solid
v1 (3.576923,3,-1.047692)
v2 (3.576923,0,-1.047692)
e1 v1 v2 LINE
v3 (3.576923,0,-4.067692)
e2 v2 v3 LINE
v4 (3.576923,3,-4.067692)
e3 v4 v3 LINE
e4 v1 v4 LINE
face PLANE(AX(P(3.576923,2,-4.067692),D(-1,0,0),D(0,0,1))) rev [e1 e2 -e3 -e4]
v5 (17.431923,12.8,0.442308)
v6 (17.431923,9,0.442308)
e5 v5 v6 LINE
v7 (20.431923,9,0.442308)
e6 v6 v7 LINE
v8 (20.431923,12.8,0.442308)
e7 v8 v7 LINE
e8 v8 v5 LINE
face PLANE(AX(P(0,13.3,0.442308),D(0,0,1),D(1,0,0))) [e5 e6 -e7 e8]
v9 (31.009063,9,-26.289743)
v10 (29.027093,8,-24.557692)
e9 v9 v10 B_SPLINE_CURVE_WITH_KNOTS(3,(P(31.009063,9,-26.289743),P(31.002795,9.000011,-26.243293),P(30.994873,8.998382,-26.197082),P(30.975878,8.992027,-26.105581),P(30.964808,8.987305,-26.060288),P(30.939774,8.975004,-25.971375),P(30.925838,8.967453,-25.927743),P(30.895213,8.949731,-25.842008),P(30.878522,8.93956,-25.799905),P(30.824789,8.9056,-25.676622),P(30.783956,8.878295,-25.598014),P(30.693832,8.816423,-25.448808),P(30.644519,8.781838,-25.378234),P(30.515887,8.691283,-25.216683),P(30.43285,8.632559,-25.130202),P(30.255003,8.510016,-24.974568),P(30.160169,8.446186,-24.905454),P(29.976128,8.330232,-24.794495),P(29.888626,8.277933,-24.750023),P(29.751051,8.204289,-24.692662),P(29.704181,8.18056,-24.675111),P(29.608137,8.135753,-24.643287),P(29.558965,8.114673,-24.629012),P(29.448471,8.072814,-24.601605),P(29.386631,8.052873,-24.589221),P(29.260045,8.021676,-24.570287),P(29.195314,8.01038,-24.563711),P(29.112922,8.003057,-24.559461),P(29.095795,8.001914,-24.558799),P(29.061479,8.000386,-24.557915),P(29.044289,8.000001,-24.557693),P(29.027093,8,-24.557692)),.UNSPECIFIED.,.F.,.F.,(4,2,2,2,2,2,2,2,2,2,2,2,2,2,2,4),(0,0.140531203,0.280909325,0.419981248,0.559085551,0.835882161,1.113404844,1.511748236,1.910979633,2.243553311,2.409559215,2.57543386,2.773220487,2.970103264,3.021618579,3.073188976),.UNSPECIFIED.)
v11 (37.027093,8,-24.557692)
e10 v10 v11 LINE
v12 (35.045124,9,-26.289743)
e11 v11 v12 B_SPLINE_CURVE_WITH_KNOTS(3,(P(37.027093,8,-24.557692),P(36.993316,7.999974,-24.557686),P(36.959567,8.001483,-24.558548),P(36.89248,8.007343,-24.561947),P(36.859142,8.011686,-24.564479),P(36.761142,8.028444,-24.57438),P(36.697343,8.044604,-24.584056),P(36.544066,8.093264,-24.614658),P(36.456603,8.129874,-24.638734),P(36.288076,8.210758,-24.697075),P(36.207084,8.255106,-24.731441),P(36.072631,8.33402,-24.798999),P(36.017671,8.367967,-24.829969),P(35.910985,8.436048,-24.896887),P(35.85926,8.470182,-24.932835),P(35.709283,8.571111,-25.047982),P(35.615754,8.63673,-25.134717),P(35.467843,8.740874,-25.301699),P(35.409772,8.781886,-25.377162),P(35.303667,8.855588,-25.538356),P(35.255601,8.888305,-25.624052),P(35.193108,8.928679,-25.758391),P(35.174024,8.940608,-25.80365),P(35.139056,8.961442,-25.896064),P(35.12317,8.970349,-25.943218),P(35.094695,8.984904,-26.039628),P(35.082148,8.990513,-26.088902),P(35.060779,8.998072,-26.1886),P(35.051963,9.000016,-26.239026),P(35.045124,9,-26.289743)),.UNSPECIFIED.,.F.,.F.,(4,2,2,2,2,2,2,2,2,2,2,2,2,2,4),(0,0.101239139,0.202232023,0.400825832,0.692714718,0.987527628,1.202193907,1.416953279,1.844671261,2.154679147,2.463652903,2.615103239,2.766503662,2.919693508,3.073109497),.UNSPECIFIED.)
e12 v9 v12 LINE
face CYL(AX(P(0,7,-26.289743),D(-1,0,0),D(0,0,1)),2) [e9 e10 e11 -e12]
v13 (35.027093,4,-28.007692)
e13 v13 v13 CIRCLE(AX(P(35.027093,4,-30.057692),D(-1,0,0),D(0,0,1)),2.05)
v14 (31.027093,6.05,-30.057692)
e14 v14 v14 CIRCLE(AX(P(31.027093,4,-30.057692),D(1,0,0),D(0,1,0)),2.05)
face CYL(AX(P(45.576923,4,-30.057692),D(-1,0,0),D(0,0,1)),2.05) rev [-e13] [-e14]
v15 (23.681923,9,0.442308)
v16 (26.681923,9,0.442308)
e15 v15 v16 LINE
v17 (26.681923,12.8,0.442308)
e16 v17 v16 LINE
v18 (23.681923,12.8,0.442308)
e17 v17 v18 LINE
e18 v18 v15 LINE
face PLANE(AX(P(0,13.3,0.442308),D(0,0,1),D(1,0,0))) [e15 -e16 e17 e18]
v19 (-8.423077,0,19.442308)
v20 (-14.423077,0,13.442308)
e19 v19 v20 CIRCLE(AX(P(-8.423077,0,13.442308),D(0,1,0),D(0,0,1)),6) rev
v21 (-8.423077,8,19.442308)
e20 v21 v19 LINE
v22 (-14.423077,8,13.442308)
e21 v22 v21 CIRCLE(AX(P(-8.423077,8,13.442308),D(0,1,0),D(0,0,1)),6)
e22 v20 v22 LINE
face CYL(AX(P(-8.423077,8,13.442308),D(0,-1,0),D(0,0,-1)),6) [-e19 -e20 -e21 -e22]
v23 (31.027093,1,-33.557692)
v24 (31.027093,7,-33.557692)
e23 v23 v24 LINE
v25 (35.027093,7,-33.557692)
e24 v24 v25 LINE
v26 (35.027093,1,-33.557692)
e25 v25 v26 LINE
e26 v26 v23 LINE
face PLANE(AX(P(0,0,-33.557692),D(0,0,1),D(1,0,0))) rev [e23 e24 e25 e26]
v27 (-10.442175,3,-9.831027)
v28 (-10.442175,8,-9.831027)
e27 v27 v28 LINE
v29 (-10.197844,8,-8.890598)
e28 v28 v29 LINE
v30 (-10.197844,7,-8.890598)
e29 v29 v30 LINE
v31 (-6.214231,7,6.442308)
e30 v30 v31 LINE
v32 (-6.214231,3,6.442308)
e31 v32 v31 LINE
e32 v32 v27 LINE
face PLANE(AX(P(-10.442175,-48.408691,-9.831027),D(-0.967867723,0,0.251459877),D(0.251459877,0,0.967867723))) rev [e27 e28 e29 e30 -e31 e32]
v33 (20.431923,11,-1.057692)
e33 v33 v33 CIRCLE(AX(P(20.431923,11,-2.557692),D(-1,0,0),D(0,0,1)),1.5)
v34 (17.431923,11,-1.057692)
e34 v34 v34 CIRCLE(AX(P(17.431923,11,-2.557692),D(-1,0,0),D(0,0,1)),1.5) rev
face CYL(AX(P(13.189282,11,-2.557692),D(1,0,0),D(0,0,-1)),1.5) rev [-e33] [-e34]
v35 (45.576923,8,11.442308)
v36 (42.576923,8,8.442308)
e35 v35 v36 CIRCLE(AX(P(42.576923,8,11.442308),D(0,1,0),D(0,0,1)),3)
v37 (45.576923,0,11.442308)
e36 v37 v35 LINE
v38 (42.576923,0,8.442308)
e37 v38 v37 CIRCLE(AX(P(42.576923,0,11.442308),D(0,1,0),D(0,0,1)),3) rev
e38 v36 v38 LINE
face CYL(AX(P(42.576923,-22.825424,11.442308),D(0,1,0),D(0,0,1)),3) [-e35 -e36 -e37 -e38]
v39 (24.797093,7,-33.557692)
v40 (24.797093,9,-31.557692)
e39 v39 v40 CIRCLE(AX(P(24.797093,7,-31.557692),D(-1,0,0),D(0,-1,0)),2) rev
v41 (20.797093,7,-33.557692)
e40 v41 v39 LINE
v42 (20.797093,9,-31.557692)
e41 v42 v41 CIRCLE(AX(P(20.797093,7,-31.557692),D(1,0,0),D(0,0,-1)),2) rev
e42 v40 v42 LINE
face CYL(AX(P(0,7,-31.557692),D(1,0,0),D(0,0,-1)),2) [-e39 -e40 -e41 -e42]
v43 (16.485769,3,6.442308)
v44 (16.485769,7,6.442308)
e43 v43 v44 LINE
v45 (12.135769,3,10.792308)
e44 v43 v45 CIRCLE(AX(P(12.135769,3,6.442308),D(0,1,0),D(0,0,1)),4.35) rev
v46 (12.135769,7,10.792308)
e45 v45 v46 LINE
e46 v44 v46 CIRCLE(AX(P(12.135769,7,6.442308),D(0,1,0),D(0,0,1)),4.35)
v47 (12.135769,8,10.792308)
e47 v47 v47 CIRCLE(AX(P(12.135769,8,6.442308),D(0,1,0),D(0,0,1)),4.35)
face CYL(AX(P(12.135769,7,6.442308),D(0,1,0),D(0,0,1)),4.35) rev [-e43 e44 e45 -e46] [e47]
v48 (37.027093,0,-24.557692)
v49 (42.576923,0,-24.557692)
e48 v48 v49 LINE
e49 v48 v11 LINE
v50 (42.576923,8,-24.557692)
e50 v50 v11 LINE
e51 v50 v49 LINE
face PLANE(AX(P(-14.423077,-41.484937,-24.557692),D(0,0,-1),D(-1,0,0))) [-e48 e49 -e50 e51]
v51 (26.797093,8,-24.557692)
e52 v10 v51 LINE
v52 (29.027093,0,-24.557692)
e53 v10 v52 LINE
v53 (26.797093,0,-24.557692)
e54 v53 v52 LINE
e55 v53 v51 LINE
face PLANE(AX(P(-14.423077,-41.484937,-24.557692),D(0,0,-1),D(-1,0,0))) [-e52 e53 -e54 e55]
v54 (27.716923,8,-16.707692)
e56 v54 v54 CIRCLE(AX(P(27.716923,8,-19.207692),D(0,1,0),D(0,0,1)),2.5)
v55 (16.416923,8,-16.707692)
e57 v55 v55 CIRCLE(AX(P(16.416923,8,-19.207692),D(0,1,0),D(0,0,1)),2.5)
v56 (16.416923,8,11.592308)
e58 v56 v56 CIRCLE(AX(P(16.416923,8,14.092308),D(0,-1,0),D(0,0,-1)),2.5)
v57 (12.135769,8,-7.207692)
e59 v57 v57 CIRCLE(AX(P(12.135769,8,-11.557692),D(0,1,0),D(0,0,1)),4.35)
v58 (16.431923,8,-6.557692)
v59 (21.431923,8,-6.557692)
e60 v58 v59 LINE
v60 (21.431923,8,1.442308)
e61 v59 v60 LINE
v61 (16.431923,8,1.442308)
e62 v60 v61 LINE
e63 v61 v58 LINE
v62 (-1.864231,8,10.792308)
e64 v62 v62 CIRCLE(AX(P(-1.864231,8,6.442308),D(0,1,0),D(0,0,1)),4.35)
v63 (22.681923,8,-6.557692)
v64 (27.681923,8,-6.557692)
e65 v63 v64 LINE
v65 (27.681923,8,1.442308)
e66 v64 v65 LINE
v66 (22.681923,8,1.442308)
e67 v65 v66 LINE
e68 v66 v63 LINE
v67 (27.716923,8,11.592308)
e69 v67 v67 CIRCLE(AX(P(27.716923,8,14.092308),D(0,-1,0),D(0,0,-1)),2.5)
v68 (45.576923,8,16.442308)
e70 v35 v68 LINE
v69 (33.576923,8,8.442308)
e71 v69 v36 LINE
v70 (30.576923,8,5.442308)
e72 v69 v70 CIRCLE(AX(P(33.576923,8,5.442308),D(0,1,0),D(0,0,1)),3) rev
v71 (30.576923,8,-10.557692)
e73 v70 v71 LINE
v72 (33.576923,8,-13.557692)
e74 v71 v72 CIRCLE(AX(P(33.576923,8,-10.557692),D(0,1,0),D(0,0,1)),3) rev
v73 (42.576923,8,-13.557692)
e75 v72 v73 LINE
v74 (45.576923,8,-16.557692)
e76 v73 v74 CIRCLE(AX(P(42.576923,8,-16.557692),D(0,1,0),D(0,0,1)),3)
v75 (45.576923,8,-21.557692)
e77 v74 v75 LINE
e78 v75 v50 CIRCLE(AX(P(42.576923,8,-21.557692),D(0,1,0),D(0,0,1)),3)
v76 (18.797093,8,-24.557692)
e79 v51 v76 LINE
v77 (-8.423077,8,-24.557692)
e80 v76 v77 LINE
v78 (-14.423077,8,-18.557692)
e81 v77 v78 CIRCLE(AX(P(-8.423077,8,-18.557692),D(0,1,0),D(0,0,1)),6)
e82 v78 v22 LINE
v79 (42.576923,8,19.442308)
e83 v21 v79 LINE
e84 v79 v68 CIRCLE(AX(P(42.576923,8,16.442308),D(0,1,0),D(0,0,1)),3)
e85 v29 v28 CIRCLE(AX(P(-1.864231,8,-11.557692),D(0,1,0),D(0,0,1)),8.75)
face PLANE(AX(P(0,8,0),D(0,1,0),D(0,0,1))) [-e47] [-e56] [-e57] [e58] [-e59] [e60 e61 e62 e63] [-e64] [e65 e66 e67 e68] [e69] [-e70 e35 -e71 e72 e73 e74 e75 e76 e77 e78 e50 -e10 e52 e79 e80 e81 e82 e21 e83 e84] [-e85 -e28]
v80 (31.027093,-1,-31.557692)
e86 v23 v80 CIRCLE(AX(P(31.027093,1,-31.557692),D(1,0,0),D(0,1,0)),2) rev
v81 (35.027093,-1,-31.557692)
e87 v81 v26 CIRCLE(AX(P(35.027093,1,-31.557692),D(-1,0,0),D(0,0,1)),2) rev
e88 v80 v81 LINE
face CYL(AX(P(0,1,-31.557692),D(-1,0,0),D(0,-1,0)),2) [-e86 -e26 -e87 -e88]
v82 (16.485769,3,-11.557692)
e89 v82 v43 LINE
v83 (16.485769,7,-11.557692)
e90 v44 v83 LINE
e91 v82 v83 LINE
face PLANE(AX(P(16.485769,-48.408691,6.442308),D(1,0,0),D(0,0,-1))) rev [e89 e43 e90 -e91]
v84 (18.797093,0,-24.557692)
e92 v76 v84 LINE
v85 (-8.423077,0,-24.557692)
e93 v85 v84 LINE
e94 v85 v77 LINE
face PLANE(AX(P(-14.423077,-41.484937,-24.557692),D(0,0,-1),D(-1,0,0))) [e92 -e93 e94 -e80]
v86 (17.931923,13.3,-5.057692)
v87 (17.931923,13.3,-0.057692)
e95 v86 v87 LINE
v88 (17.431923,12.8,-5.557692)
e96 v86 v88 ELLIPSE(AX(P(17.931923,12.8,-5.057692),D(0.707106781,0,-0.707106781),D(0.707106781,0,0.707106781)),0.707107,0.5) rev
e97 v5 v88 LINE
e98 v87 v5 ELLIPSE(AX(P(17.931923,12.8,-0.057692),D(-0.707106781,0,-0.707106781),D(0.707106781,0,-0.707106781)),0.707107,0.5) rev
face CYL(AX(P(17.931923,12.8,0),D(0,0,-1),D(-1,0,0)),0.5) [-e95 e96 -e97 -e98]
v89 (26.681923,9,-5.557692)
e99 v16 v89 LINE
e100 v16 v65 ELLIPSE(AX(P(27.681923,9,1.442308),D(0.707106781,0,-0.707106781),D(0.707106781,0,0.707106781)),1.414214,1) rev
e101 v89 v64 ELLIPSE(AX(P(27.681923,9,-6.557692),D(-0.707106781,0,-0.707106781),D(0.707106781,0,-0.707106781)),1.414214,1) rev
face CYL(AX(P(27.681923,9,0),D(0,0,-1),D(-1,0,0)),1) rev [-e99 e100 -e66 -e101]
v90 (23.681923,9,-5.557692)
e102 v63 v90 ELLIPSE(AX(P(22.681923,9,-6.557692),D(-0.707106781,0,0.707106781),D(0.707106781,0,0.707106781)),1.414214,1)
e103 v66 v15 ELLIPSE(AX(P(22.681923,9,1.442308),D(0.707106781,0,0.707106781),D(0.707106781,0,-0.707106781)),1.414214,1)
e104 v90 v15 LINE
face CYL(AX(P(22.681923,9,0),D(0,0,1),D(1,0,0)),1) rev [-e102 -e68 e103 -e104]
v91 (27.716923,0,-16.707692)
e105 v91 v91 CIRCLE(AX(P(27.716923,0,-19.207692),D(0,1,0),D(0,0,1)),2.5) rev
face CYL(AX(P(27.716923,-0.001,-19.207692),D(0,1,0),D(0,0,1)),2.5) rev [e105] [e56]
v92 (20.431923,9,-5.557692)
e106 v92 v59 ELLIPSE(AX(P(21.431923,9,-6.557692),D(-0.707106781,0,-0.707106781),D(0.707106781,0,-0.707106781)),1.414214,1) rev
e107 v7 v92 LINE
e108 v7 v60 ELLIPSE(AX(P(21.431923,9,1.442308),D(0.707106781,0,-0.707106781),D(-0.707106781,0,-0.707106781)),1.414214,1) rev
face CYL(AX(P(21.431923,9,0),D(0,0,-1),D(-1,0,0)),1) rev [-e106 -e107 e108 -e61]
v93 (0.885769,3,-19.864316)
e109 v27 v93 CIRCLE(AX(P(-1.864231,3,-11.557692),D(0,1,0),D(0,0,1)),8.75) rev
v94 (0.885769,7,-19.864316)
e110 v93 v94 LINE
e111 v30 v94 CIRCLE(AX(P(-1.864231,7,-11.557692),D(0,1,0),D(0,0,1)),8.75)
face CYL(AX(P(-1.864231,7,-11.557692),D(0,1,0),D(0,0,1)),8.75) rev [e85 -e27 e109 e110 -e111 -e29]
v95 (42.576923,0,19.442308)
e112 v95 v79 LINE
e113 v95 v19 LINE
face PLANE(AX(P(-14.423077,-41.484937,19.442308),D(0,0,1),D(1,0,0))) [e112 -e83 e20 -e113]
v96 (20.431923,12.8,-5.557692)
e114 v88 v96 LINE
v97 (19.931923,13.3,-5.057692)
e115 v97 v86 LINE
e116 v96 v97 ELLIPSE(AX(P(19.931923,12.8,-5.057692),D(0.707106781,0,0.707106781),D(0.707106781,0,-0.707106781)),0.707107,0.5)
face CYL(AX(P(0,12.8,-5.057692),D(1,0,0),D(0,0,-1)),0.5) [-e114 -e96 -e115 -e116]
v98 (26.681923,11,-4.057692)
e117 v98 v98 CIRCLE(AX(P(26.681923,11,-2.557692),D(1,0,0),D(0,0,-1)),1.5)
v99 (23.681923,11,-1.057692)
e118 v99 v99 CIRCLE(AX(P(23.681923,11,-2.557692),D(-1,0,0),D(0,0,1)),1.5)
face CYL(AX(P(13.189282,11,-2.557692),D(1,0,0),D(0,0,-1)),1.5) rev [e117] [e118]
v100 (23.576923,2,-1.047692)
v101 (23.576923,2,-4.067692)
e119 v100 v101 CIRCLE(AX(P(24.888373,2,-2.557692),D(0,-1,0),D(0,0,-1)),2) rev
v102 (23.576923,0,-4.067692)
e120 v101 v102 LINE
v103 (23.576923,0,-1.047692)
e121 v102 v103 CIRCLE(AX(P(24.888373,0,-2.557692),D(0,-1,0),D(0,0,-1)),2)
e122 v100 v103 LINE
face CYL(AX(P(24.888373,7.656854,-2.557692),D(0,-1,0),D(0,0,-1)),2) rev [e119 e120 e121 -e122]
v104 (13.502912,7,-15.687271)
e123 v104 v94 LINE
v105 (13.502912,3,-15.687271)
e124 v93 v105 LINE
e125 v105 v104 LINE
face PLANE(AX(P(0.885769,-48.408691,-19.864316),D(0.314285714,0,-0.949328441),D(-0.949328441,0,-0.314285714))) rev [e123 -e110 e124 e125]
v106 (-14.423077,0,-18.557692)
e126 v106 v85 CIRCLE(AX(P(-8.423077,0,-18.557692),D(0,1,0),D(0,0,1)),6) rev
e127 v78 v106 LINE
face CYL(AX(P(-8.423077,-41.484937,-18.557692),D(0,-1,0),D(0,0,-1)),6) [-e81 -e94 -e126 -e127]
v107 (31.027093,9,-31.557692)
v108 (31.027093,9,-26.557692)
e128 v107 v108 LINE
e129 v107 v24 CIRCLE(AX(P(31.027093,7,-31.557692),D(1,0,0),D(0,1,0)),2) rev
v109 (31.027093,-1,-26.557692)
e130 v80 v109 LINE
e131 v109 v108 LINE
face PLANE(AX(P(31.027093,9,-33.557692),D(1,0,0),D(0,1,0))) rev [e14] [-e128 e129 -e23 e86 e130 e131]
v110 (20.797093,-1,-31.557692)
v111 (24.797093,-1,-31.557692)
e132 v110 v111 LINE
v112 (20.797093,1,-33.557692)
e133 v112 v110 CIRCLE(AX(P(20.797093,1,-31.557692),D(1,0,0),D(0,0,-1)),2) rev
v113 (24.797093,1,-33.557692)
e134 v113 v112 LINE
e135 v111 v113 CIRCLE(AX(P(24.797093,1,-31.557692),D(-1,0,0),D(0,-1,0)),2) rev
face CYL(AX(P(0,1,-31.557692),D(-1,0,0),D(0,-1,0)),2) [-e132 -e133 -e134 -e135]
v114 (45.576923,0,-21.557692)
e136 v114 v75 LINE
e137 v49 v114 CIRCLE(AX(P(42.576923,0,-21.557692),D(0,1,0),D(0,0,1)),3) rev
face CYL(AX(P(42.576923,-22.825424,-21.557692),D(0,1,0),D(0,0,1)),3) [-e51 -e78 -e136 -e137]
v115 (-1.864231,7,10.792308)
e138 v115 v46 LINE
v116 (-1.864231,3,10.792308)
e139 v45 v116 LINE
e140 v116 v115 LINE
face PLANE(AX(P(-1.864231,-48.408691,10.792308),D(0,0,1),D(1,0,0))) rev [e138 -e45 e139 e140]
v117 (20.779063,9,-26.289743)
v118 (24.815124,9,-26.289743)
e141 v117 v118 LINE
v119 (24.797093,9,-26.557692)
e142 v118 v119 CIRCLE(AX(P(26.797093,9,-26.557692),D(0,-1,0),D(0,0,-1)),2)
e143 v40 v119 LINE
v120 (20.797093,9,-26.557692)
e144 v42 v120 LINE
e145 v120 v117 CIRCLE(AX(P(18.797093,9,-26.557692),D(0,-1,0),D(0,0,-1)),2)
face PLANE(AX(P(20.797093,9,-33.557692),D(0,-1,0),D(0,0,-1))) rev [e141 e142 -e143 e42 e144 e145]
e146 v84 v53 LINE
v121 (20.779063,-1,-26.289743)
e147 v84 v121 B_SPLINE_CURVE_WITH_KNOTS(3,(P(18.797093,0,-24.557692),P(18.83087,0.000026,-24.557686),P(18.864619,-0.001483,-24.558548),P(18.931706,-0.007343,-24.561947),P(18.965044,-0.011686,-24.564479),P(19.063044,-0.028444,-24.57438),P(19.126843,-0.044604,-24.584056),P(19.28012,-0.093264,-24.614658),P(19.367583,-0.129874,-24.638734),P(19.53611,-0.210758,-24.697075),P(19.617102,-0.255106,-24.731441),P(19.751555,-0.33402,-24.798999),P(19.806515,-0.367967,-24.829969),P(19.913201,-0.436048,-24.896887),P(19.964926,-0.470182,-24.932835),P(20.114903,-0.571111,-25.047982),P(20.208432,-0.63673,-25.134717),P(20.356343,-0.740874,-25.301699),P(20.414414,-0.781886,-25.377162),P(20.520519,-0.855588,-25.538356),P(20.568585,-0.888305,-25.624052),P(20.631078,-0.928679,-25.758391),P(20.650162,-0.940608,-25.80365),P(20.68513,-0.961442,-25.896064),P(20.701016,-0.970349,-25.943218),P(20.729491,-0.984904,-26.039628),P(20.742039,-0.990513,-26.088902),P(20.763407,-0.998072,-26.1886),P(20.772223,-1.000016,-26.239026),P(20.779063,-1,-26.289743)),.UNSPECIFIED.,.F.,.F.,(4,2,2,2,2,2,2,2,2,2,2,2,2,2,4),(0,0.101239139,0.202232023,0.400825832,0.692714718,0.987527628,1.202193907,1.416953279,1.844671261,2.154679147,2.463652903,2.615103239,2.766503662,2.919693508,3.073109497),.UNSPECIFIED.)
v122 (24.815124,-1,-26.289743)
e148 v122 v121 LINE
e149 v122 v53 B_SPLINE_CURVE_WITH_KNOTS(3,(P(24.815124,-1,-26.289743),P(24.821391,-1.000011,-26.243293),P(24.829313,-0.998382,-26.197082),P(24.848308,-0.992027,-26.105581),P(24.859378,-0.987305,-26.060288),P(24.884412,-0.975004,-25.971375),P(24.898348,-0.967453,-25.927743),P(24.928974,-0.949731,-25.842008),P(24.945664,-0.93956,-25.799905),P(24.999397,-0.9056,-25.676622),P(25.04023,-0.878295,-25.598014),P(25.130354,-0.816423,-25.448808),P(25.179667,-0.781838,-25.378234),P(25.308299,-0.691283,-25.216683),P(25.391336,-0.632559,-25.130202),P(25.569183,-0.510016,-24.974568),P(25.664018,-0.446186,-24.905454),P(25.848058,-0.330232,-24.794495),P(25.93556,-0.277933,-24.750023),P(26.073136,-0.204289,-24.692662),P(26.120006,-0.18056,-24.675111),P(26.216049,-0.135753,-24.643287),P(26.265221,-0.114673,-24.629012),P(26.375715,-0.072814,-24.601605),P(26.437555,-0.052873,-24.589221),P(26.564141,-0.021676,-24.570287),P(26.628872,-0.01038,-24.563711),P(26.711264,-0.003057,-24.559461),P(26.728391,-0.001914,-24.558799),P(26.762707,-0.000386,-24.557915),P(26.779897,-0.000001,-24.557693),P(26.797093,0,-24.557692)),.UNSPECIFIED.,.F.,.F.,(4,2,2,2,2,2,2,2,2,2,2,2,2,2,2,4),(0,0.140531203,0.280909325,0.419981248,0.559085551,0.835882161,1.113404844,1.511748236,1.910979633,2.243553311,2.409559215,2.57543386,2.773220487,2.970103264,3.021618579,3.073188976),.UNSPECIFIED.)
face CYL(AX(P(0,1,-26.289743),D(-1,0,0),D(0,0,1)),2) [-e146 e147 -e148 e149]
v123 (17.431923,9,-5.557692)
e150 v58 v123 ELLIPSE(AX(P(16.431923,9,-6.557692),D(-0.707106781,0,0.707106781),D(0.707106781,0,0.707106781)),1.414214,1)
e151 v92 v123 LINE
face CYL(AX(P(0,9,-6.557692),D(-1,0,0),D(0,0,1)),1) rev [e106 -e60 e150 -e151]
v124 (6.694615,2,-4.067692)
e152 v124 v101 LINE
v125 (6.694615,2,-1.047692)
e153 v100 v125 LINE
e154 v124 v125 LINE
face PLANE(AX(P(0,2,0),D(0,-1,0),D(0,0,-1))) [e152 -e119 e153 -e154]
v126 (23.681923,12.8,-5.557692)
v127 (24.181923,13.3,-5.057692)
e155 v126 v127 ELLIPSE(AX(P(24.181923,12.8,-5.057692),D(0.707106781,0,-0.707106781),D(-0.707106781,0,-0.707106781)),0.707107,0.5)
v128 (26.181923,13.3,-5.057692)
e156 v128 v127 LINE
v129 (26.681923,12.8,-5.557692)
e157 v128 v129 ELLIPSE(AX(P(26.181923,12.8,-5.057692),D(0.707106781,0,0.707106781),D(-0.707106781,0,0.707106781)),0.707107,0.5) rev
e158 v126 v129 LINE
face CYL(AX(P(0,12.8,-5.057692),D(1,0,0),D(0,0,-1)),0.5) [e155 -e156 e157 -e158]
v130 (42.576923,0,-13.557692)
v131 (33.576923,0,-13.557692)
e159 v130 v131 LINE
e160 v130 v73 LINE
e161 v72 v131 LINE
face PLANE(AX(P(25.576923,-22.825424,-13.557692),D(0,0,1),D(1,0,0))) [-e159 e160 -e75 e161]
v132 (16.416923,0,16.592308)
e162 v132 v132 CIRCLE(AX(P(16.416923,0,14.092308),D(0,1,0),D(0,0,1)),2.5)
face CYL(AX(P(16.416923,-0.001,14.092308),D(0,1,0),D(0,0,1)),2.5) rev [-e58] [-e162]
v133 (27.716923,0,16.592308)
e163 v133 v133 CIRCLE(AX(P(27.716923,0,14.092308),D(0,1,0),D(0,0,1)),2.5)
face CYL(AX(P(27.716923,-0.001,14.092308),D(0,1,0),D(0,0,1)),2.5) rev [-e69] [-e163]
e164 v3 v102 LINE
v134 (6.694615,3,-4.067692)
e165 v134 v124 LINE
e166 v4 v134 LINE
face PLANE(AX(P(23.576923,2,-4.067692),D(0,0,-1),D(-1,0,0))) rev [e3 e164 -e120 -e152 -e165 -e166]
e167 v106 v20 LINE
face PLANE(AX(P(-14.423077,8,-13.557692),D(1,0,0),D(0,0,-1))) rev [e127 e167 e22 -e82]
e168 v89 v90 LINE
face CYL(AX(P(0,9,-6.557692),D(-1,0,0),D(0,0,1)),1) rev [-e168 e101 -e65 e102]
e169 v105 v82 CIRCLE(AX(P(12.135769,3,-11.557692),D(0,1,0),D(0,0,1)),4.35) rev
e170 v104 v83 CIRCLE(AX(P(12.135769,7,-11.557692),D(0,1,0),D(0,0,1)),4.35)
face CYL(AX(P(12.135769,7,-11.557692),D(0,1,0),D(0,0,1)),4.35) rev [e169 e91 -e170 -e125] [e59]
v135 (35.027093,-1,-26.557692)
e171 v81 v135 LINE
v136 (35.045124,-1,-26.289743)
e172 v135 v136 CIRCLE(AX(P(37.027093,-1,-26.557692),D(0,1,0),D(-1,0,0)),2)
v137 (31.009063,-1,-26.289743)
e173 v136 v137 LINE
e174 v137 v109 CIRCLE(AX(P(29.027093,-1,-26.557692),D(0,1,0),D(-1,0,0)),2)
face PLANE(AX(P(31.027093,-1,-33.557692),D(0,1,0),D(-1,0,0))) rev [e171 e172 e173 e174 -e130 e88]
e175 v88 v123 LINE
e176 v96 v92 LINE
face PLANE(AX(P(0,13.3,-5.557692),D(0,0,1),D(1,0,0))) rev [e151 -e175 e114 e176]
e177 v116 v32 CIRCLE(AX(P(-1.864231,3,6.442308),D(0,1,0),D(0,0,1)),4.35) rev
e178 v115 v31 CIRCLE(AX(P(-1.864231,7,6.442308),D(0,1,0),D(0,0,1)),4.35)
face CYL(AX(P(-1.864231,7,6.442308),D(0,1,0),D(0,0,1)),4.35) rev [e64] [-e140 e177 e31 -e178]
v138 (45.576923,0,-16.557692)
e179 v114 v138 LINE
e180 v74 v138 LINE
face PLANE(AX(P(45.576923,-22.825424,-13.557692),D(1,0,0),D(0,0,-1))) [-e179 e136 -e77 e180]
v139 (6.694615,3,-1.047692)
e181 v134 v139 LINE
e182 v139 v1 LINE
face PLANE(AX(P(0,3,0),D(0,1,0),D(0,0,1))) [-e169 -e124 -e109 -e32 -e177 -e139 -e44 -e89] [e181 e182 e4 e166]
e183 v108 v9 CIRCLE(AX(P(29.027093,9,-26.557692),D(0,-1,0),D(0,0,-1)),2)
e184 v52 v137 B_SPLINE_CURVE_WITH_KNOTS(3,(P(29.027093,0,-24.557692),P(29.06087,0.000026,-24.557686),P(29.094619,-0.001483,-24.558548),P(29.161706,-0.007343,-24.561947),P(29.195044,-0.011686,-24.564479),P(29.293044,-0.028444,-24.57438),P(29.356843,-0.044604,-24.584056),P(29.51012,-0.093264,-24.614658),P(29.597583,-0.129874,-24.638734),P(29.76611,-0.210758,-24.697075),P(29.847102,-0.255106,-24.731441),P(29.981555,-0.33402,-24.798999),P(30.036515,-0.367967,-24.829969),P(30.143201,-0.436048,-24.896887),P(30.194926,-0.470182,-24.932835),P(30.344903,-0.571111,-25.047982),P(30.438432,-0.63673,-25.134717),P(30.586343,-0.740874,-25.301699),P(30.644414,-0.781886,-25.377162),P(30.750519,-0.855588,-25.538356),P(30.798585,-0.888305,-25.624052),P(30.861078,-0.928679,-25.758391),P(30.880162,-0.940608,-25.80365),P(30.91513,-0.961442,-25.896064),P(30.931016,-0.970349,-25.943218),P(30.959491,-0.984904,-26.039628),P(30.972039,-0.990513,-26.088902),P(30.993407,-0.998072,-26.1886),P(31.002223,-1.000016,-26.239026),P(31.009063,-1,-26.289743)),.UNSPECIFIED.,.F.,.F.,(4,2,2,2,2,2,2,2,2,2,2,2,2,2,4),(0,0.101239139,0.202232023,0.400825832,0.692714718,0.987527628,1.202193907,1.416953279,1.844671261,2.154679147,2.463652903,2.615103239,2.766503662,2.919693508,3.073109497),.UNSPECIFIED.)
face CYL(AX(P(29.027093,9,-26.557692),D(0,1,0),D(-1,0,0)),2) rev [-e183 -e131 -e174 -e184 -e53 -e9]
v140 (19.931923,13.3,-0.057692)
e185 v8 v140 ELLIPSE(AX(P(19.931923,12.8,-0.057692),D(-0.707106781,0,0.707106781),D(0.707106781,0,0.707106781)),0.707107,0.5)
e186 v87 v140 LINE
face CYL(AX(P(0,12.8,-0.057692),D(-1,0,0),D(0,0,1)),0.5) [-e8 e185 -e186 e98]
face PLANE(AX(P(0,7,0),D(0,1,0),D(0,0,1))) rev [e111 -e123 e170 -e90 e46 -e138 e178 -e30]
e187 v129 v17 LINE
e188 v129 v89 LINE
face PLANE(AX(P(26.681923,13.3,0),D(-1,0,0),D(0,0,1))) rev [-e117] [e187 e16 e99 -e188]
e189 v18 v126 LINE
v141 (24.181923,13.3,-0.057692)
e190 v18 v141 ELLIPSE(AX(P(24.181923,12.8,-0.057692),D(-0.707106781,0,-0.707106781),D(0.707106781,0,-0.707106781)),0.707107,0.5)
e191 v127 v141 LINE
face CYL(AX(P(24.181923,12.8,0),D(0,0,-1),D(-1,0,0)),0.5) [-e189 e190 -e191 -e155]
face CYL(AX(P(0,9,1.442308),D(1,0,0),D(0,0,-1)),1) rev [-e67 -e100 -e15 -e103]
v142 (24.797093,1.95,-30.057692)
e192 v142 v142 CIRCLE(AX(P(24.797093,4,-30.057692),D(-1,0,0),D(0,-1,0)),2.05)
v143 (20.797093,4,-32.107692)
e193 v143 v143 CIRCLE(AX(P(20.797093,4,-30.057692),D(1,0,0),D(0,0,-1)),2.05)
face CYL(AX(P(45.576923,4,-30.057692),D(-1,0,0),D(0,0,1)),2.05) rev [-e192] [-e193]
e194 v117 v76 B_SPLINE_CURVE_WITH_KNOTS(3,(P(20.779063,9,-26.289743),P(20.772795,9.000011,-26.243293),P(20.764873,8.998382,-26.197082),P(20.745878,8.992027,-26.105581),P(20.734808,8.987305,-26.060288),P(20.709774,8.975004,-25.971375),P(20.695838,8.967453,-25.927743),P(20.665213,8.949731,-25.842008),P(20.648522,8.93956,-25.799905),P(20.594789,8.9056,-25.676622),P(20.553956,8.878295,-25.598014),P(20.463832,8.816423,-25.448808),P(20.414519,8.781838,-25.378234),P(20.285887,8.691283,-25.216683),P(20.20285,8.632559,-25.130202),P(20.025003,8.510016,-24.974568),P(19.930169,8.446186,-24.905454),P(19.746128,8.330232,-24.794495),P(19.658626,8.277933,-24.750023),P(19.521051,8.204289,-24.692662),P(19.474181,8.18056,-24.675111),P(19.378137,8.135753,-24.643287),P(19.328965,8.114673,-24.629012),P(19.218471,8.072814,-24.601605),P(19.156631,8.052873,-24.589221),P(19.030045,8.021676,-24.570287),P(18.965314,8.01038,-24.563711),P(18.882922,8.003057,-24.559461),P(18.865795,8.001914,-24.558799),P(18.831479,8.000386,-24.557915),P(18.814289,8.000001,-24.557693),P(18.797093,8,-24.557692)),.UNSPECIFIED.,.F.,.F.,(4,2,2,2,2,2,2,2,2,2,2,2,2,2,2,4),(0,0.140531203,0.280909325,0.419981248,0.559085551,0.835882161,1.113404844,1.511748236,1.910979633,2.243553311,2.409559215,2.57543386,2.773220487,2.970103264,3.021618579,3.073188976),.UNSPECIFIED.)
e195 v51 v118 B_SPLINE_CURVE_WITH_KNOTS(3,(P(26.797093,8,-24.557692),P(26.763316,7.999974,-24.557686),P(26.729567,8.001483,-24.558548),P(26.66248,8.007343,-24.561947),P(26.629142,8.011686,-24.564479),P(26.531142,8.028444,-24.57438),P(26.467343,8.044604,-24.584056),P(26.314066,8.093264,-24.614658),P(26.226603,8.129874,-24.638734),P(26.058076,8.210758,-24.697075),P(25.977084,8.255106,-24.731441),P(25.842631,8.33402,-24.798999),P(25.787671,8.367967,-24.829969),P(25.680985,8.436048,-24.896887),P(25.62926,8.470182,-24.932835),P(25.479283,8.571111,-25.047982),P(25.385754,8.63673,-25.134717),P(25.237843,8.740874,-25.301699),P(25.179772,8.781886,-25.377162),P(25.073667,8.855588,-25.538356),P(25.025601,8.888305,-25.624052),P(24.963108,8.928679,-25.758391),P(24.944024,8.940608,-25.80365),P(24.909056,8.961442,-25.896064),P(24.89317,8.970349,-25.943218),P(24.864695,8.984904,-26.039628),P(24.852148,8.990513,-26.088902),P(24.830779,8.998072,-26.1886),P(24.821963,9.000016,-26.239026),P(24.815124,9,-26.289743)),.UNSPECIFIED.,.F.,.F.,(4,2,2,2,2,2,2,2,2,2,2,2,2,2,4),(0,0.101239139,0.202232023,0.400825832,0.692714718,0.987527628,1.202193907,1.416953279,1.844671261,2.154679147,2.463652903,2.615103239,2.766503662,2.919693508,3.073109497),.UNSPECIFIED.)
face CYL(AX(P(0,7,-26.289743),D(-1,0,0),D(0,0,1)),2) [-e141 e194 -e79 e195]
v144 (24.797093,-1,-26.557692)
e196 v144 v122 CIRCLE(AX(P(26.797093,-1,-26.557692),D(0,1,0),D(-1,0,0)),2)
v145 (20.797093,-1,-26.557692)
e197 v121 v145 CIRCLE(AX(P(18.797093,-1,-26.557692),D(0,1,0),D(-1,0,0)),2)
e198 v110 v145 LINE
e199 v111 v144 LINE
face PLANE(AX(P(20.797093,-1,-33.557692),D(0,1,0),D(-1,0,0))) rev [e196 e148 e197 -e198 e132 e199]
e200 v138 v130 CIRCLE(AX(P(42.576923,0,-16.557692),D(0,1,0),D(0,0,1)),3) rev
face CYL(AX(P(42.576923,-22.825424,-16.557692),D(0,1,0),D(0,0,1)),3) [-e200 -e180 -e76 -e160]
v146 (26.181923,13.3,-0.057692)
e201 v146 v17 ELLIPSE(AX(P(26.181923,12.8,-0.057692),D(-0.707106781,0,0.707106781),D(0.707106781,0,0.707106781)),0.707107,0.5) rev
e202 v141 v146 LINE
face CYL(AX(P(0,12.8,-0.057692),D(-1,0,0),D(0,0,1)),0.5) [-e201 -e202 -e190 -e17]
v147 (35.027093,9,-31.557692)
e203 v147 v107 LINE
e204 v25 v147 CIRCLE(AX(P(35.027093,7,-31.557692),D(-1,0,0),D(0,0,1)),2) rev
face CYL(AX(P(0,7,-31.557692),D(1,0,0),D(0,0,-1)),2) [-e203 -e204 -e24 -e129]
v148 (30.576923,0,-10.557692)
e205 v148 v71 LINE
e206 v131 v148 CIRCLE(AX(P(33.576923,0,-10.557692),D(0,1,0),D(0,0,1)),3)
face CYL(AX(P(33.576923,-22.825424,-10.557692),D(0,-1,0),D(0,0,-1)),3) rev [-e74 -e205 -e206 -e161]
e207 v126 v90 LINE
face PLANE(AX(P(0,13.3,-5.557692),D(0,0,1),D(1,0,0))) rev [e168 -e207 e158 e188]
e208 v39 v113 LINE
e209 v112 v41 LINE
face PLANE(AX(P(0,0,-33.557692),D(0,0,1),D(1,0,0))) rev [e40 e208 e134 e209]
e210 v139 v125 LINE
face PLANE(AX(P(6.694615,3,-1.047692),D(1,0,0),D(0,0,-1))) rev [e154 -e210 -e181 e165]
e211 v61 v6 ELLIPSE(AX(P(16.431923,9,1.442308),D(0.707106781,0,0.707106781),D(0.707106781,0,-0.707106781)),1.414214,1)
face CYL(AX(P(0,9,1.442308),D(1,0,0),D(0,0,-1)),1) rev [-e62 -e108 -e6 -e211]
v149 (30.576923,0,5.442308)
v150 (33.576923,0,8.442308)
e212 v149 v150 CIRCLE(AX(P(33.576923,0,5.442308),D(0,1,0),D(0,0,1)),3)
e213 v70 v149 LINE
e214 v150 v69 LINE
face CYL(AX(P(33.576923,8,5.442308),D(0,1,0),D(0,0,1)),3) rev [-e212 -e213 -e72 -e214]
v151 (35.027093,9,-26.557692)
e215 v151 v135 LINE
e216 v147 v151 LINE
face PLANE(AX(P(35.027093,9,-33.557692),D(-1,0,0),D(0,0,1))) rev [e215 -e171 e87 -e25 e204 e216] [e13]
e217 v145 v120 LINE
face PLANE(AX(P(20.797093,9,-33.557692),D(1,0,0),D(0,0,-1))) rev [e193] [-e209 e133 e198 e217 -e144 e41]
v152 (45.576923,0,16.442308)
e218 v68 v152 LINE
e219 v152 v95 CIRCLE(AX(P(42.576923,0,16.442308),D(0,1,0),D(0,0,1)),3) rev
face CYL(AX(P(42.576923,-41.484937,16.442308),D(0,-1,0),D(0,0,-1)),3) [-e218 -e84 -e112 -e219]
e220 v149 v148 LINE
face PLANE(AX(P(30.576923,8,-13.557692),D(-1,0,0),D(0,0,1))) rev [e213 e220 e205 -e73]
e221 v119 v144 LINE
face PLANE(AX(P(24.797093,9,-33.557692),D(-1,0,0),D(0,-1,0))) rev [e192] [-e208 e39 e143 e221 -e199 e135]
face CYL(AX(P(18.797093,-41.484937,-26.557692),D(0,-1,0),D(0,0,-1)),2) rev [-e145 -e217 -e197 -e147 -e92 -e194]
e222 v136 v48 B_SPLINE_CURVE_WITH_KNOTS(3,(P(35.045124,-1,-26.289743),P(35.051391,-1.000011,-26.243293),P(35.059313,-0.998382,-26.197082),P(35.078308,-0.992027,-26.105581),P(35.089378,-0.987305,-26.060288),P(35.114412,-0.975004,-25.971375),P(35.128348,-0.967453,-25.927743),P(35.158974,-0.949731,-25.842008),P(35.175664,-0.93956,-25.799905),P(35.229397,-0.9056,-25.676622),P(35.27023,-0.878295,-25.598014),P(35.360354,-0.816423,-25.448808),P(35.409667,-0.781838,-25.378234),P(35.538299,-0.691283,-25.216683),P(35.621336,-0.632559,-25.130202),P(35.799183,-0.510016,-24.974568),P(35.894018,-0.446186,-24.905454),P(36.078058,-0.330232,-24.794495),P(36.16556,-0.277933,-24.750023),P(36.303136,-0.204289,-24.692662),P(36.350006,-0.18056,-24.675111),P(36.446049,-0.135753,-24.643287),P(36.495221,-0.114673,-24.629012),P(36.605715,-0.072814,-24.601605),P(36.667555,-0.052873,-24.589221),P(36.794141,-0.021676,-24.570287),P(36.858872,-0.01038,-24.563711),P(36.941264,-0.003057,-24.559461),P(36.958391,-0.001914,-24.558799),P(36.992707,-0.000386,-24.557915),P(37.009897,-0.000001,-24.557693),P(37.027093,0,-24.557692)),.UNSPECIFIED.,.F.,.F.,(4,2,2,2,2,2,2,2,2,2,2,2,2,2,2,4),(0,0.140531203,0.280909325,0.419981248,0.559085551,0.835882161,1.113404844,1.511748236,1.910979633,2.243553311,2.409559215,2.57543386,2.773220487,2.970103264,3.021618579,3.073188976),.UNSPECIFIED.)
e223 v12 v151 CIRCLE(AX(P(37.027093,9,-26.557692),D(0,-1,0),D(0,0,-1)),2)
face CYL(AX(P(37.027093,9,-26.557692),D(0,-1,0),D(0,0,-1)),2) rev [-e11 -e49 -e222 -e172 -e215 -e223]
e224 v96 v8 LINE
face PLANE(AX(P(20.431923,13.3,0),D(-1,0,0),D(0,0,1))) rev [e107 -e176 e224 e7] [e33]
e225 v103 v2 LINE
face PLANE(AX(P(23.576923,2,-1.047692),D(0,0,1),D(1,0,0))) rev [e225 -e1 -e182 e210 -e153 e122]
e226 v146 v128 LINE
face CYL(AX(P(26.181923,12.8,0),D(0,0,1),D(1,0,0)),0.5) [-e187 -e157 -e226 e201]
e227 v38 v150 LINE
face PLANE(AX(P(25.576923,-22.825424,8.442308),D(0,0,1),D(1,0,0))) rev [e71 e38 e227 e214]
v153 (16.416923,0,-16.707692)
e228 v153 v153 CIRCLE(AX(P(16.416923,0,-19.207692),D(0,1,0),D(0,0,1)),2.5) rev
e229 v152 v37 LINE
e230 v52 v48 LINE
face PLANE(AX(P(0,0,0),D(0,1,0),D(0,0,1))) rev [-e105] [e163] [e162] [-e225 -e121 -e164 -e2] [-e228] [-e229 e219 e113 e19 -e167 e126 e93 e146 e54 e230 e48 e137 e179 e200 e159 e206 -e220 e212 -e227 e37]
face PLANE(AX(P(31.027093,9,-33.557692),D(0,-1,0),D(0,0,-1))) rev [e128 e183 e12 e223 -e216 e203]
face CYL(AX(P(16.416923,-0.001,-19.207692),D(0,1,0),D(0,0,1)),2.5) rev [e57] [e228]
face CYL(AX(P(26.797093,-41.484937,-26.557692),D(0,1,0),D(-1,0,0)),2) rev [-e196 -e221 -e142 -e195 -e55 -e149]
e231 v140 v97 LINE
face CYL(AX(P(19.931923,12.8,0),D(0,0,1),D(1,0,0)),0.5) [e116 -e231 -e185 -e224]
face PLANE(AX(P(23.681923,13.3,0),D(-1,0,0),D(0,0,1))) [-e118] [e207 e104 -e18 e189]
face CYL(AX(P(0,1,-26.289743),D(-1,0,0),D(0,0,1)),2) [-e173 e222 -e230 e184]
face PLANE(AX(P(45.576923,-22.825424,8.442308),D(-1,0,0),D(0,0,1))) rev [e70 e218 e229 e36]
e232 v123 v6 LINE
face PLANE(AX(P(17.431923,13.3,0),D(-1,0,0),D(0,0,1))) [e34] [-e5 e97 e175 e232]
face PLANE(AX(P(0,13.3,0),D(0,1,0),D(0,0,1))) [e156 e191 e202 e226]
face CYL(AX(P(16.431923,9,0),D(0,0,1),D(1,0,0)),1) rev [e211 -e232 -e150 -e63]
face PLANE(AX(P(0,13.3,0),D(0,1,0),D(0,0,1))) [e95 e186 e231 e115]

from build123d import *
from build123d.topology import SkipClean

# Parameters (mm, degrees)
SKETCH2_W                = 45
SKETCH2_H                = 22
BOSS_EXTRUDE1_DEPTH      = 8
SKETCH3_W                = 20
SKETCH3_H                = 3.02
CUT_EXTRUDE1_DEPTH       = 2
SKETCH11_R               = 2
CUT_EXTRUDE4_DEPTH       = 2
SKETCH19_W               = 3.117691909
SKETCH19_H               = 3.02
CUT_EXTRUDE5_DEPTH       = 3
SKETCH29_W               = 40
SKETCH29_H               = 11
BOSS_EXTRUDE6_DEPTH      = 8
SKETCH21_W               = 30
SKETCH21_H               = 36
CUT_EXTRUDE8_DEPTH       = 5
SKETCH24_W               = 30
SKETCH24_H               = 36
SKETCH24_R               = 4.35
SKETCH24_R_2             = 8.75
BOSS_EXTRUDE3_DEPTH      = 1
SKETCH25_W               = 3
SKETCH25_H               = 6
BOSS_EXTRUDE4_DEPTH      = 5.3
CUT_EXTRUDE9_REACH       = 51.695
SKETCH26_R               = 1.5
FILLET2_R                = 1
FILLET3_R                = 0.5
SKETCH27_W               = 20
SKETCH27_H               = 11
BOSS_EXTRUDE5_DEPTH      = 8
CUT_EXTRUDE10_REACH      = 54.386
SKETCH28_R               = 2.5
FILLET5_R                = 6
FILLET6_R                = 3
BOSS_EXTRUDE7_START      = -5
SKETCH30_W               = 30.600469098
SKETCH30_H               = 41.30937857
SKETCH30_R               = 2.5
BOSS_EXTRUDE7_DEPTH      = 5
SKETCH32_W               = 4
SKETCH32_H               = 10
BOSS_EXTRUDE8_DEPTH      = 9
CUT_EXTRUDE11_DEPTH      = 51.432817558
CUT_EXTRUDE11_DEPTH_BACK = 51.432817558
SKETCH34_R               = 2.05
FILLET7_R                = 2
FILLET8_DEPTH            = 7.999999573
FILLET8_START            = -1
FILLET8_2_DEPTH          = 10
FILLET8_START_2          = 18
FILLET8_3_DEPTH          = 20


with BuildPart() as part:
    # Sketch2 → Boss-Extrude1 (new body)
    with BuildSketch(Plane(origin=(0, 0, 0), x_dir=(1, 0, 0), z_dir=(0, 1, 0))):
        with Locations((8.076923077, 2.557692308)):
            Rectangle(SKETCH2_W, SKETCH2_H)
    extrude(amount=BOSS_EXTRUDE1_DEPTH)

    # Sketch3 → Cut-Extrude1 (cut)
    with BuildSketch(Plane.XZ):
        with Locations((13.576923077, -2.557692308)):
            Rectangle(SKETCH3_W, SKETCH3_H)
    extrude(amount=-CUT_EXTRUDE1_DEPTH, mode=Mode.SUBTRACT)

    # Sketch11 → Cut-Extrude4 (cut)
    with BuildSketch(Plane.XZ):
        with Locations((24.888372657, -2.557692308)):
            Circle(SKETCH11_R)
    extrude(amount=-CUT_EXTRUDE4_DEPTH, mode=Mode.SUBTRACT)

    # Sketch19 → Cut-Extrude5 (cut)
    with BuildSketch(Plane.XZ):
        with Locations((5.135769032, -2.557692308)):
            Rectangle(SKETCH19_W, SKETCH19_H)
    extrude(amount=-CUT_EXTRUDE5_DEPTH, mode=Mode.SUBTRACT)

    # Sketch29 → Boss-Extrude6 (add)
    with BuildSketch(Plane(origin=(0, 8, 0), x_dir=(1, 0, 0), z_dir=(0, 1, 0))):
        with Locations((5.576923077, 19.057692308)):
            Rectangle(SKETCH29_W, SKETCH29_H)
        with Locations((5.576923077, -13.942307692)):
            Rectangle(SKETCH29_W, SKETCH29_H)
    extrude(amount=-BOSS_EXTRUDE6_DEPTH)

    # Sketch21 → Cut-Extrude8 (cut)
    with BuildSketch(Plane.XZ.offset(-3)):
        with Locations((4.135769031, -2.557692308)):
            Rectangle(SKETCH21_W, SKETCH21_H)
    extrude(amount=-CUT_EXTRUDE8_DEPTH, mode=Mode.SUBTRACT)

    # Sketch24 → Boss-Extrude3 (add)
    with BuildSketch(Plane(origin=(0, 8, 0), x_dir=(1, 0, 0), z_dir=(0, 1, 0))):
        with Locations((4.135769031, 2.557692308)):
            Rectangle(SKETCH24_W, SKETCH24_H)
        with Locations(Location((12.135769031, 11.557692308, 0), (0, 0, 270))):
            Circle(SKETCH24_R, mode=Mode.SUBTRACT)
        with Locations(Location((-1.864230969, 11.557692308, 0), (0, 0, 270))):
            Circle(SKETCH24_R_2, mode=Mode.SUBTRACT)
        with Locations(Location((12.135769031, -6.442307692, 0), (0, 0, 270))):
            Circle(SKETCH24_R, mode=Mode.SUBTRACT)
        with Locations(Location((-1.864230969, -6.442307692, 0), (0, 0, 270))):
            Circle(SKETCH24_R, mode=Mode.SUBTRACT)
    extrude(amount=-BOSS_EXTRUDE3_DEPTH)

    # Sketch25 → Boss-Extrude4 (add)
    with BuildSketch(Plane(origin=(0, 8, 0), x_dir=(1, 0, 0), z_dir=(0, 1, 0))):
        with Locations((18.931923077, 2.557692308)):
            Rectangle(SKETCH25_W, SKETCH25_H)
        with Locations((25.181923077, 2.557692308)):
            Rectangle(SKETCH25_W, SKETCH25_H)
    extrude(amount=BOSS_EXTRUDE4_DEPTH)

    # Cut-Extrude9: up to this face of the body (flat: up to its plane)
    cut_extrude9_end = Plane(part.part.faces().sort_by_distance((17.431923077, 10.65, -2.557692308))[0])
    # Sketch26 → Cut-Extrude9 (cut, up to the picked face)
    with BuildSketch(Plane(origin=(26.681923077, 0, 0), x_dir=(0, 0, -1), z_dir=(1, 0, 0)), mode=Mode.PRIVATE) as cut_extrude9_sk1:
        with Locations((2.557692308, 11)):
            Circle(SKETCH26_R)
    cut_extrude9_tool1 = split(extrude(cut_extrude9_sk1.sketch, amount=-CUT_EXTRUDE9_REACH, mode=Mode.PRIVATE), bisect_by=cut_extrude9_end, keep=Keep.BOTH, mode=Mode.PRIVATE)
    add(cut_extrude9_tool1.solids().sort_by(Axis((26.681923, 11, -2.557692), (-1, 0, 0)))[0], mode=Mode.SUBTRACT)

    # Fillet2
    fillet2_edges = [part.edges().sort_by_distance(p)[0] for p in [
        (20.431923077, 8, -2.557692308),
        (18.931923077, 8, -5.557692308),
        (17.431923077, 8, -2.557692308),
        (18.931923077, 8, 0.442307692),
        (26.681923077, 8, -2.557692308),
        (25.181923077, 8, -5.557692308),
        (23.681923077, 8, -2.557692308),
        (25.181923077, 8, 0.442307692),
    ]]
    fillet(fillet2_edges, radius=FILLET2_R)

    # Fillet3
    fillet3_edges = [part.edges().sort_by_distance(p)[0] for p in [
        (17.431923077, 13.3, -2.557692308),
        (18.931923077, 13.3, 0.442307692),
        (20.431923077, 13.3, -2.557692308),
        (18.931923077, 13.3, -5.557692308),
        (23.681923077, 13.3, -2.557692308),
        (25.181923077, 13.3, 0.442307692),
        (26.681923077, 13.3, -2.557692308),
        (25.181923077, 13.3, -5.557692308),
    ]]
    fillet(fillet3_edges, radius=FILLET3_R)

    # Sketch27 → Boss-Extrude5 (add)
    with BuildSketch(Plane(origin=(0, 8, 0), x_dir=(1, 0, 0), z_dir=(0, 1, 0))):
        with Locations((35.576923077, 19.057692308)):
            Rectangle(SKETCH27_W, SKETCH27_H)
    boss_extrude5 = extrude(amount=-BOSS_EXTRUDE5_DEPTH)

    # Sketch28 → Cut-Extrude10 (cut, up to next)
    with BuildSketch(Plane(origin=(0, 8, 0), x_dir=(1, 0, 0), z_dir=(0, 1, 0)), mode=Mode.PRIVATE) as cut_extrude10_sk1:
        with Locations(Location((16.416923077, 19.207692308, 0), (0, 0, 270))):
            Circle(SKETCH28_R)
    cut_extrude10_tool1 = extrude(cut_extrude10_sk1.sketch, amount=-CUT_EXTRUDE10_REACH, mode=Mode.PRIVATE) & part.part
    # Sketch28 → Cut-Extrude10 (cut, up to next)
    with BuildSketch(Plane(origin=(0, 8, 0), x_dir=(1, 0, 0), z_dir=(0, 1, 0)), mode=Mode.PRIVATE) as cut_extrude10_sk2:
        with Locations(Location((27.716923077, 19.207692308, 0), (0, 0, 270))):
            Circle(SKETCH28_R)
    cut_extrude10_tool2 = extrude(cut_extrude10_sk2.sketch, amount=-CUT_EXTRUDE10_REACH, mode=Mode.PRIVATE) & part.part
    cut_extrude10_1 = cut_extrude10_tool1.solids().sort_by_distance((16.416923, 8, -19.207692))[0]
    add(cut_extrude10_1, mode=Mode.SUBTRACT)
    cut_extrude10_2 = cut_extrude10_tool2.solids().sort_by_distance((27.716923, 8, -19.207692))[0]
    add(cut_extrude10_2, mode=Mode.SUBTRACT)
    cut_extrude10 = cut_extrude10_1 + cut_extrude10_2  # Cut-Extrude10 as one shape, for the pattern or mirror that repeats it

    # Mirror1: Boss-Extrude5, Cut-Extrude10 across plane
    add(boss_extrude5.mirror(Plane.XY.offset(-2.557692308)))
    add(cut_extrude10.mirror(Plane.XY.offset(-2.557692308)), mode=Mode.SUBTRACT)

    # Fillet5
    fillet5_edges = [part.edges().sort_by_distance(p)[0] for p in [
        (-14.423076923, 4, -24.557692308),
        (-14.423076923, 4, 19.442307692),
    ]]
    fillet(fillet5_edges, radius=FILLET5_R)

    # Fillet6
    fillet6_edges = [part.edges().sort_by_distance(p)[0] for p in [
        (45.576923077, 4, -13.557692308),
        (45.576923077, 4, -24.557692308),
        (45.576923077, 4, 19.442307692),
        (45.576923077, 4, 8.442307692),
        (30.576923077, 4, -13.557692308),
        (30.576923077, 4, 8.442307692),
    ]]
    fillet(fillet6_edges, radius=FILLET6_R)

    # Sketch30 → Boss-Extrude7 (add)
    with SkipClean():  # the faces are left unmerged after this step: merging them gives an invalid solid
        with BuildSketch(Plane(origin=(0, 8, 0), x_dir=(1, 0, 0), z_dir=(0, 1, 0)).offset(BOSS_EXTRUDE7_START)):
            with Locations((4.108223654, 2.521201559)):
                Rectangle(SKETCH30_W, SKETCH30_H)
            with Locations(Location((16.416923077, -14.092307692, 0), (0, 0, 270))):
                Circle(SKETCH30_R, mode=Mode.SUBTRACT)
            with Locations(Location((16.416923077, 19.207692308, 0), (0, 0, 270))):
                Circle(SKETCH30_R, mode=Mode.SUBTRACT)
            with BuildLine():
                Line((-1.864230969, -10.792307692), (12.135769031, -10.792307692))
                ThreePointArc((12.135769031, -10.792307692), (15.21168353, -9.51822219), (16.485769031, -6.442307692))
                Line((16.485769031, -6.442307692), (16.485769031, 11.557692308))
                ThreePointArc((16.485769031, 11.557692308), (15.662068184, 14.104791498), (13.502911889, 15.687271028))
                Line((13.502911889, 15.687271028), (0.885769031, 19.864316171))
                ThreePointArc((0.885769031, 19.864316171), (-7.665778762, 18.107848275), (-10.44217516, 9.831026894))
                Line((-10.44217516, 9.831026894), (-6.214230969, -6.442307692))
                ThreePointArc((-6.214230969, -6.442307692), (-4.940145467, -9.51822219), (-1.864230969, -10.792307692))
            make_face(mode=Mode.SUBTRACT)
        extrude(amount=BOSS_EXTRUDE7_DEPTH)

    # Sketch32 → Boss-Extrude8 (add)
    with SkipClean():  # the faces are left unmerged after this step: merging them gives an invalid solid
        with BuildSketch(Plane(origin=(0, 0, -24.557692308), x_dir=(-1, 0, 0), z_dir=(0, 0, -1))):
            with Locations((-22.797093063, 4)):
                Rectangle(SKETCH32_W, SKETCH32_H)
            with Locations((-33.027093063, 4)):
                Rectangle(SKETCH32_W, SKETCH32_H)
        extrude(amount=BOSS_EXTRUDE8_DEPTH)

    # Sketch34 → Cut-Extrude11 (cut, two sides: drawn at the far end of the back side and taken through both)
    with SkipClean():  # the faces are left unmerged after this step: merging them gives an invalid solid
        with BuildSketch(Plane.ZY.offset(-20.797093063).offset(-CUT_EXTRUDE11_DEPTH_BACK)):
            with Locations((-30.057692308, 4)):
                Circle(SKETCH34_R)
        extrude(amount=CUT_EXTRUDE11_DEPTH + CUT_EXTRUDE11_DEPTH_BACK, mode=Mode.SUBTRACT)

    # Fillet7
    # the kernel refuses this fillet: 2 mm, written as the material it takes off along each edge
    with BuildSketch(Plane(origin=(39.357220082, -1, -24.557692308), x_dir=(0, 0, -1), z_dir=(-1, 0, 0))) as fillet7_piece_1:
        with BuildLine():
            CenterArc((1.732050808, -2), FILLET7_R, 90, 60)
            Line((0, -1), (-0.034641016, -0.98))
            ThreePointArc((-0.034641016, -0.98), (-0.04, -0.5), (-0.04, 0))
            Line((-0.04, 0), (0, 0.04))
            Line((0, 0.04), (1.732050808, 0.04))
            Line((1.732050808, 0.04), (1.732050808, 0))
        make_face()
    extrude(amount=12.660254038, mode=Mode.SUBTRACT)
    with BuildSketch(Plane(origin=(40.027093063, -1, -33.557692308), x_dir=(0, 1, 0), z_dir=(-1, 0, 0)), Plane(origin=(29.797093063, -1, -33.557692308), x_dir=(0, 1, 0), z_dir=(-1, 0, 0))) as fillet7_piece_2:
        with BuildLine():
            CenterArc((FILLET7_R, -FILLET7_R), FILLET7_R, 90, 90)
            Line((0, -FILLET7_R), (-FILLET7_R * 0.02, -FILLET7_R))
            Line((-FILLET7_R * 0.02, -FILLET7_R), (-FILLET7_R * 0.02, FILLET7_R * 0.02))
            Line((-FILLET7_R * 0.02, FILLET7_R * 0.02), (FILLET7_R, FILLET7_R * 0.02))
            Line((FILLET7_R, FILLET7_R * 0.02), (FILLET7_R, 0))
        make_face()
    extrude(amount=14, mode=Mode.SUBTRACT)
    with BuildSketch(Plane(origin=(26.696966044, 9, -24.557692308), x_dir=(0, -1, 0), z_dir=(1, 0, 0)), Plane(origin=(16.466966044, 9, -24.557692308), x_dir=(0, -1, 0), z_dir=(1, 0, 0)), Plane(origin=(29.127220082, -1, -24.557692308), x_dir=(0, 1, 0), z_dir=(-1, 0, 0))) as fillet7_piece_3:
        with BuildLine():
            CenterArc((2, 1.732050808), FILLET7_R, 180, 60)
            Line((0, 1.732050808), (-0.04, 1.732050808))
            Line((-0.04, 1.732050808), (-0.04, 0))
            Line((-0.04, 0), (0, -0.04))
            ThreePointArc((0, -0.04), (0.5, -0.04), (0.98, -0.034641016))
            Line((0.98, -0.034641016), (1, 0))
        make_face()
    extrude(amount=12.660254038, mode=Mode.SUBTRACT)
    with BuildSketch(Plane(origin=(26.027093063, 9, -33.557692308), x_dir=(0, 0, 1), z_dir=(1, 0, 0)), Plane(origin=(15.797093063, 9, -33.557692308), x_dir=(0, 0, 1), z_dir=(1, 0, 0))) as fillet7_piece_4:
        with BuildLine():
            CenterArc((FILLET7_R, FILLET7_R), FILLET7_R, 180, 90)
            Line((0, FILLET7_R), (-FILLET7_R * 0.02, FILLET7_R))
            Line((-FILLET7_R * 0.02, FILLET7_R), (-FILLET7_R * 0.02, -FILLET7_R * 0.02))
            Line((-FILLET7_R * 0.02, -FILLET7_R * 0.02), (FILLET7_R, -FILLET7_R * 0.02))
            Line((FILLET7_R, -FILLET7_R * 0.02), (FILLET7_R, 0))
        make_face()
    extrude(amount=14, mode=Mode.SUBTRACT)

    # Fillet8: read off the stored shape, not the designer's step
    # Fillet8 outline → Fillet8 (add)
    with BuildSketch(Plane(origin=(0, 0, 0), x_dir=(1, 0, 0), z_dir=(0, 1, 0))):
        with BuildLine():
            ThreePointArc((31.027093063, 26.557692308), (30.441306625, 25.143478745), (29.027093063, 24.557692308))
            Line((29.027093063, 24.557692308), (31.027093063, 24.557692308))
            Line((31.027093063, 24.557692308), (31.027093063, 26.557692308))
        make_face()
        with BuildLine():
            ThreePointArc((26.797093063, 24.557692308), (25.3828795, 25.143478746), (24.797093063, 26.557692308))
            Line((24.797093063, 26.557692308), (24.797093063, 24.557692308))
            Line((24.797093063, 24.557692308), (26.797093063, 24.557692308))
        make_face()
        with BuildLine():
            Line((35.027093063, 24.557692308), (37.027093063, 24.557692308))
            ThreePointArc((37.027093063, 24.557692308), (35.612879501, 25.143478745), (35.027093063, 26.557692308))
            Line((35.027093063, 26.557692308), (35.027093063, 24.557692308))
        make_face()
    extrude(amount=FILLET8_DEPTH)

    # Fillet8 2 outline → Fillet8 2 (add)
    with BuildSketch(Plane(origin=(0, 0, 0), x_dir=(1, 0, 0), z_dir=(0, 1, 0)).offset(FILLET8_START)):
        with BuildLine():
            Line((20.797093063, 24.557692308), (20.797093063, 26.557692308))
            ThreePointArc((20.797093063, 26.557692308), (20.211306625, 25.143478745), (18.797093063, 24.557692308))
            Line((18.797093063, 24.557692308), (20.797093063, 24.557692308))
        make_face()
        with BuildLine():
            ThreePointArc((31.027093063, 26.557692308), (30.441306625, 25.143478745), (29.027093063, 24.557692308))
            Line((29.027093063, 24.557692308), (31.027093063, 24.557692308))
            Line((31.027093063, 24.557692308), (31.027093063, 26.557692308))
        make_face()
        with BuildLine():
            ThreePointArc((26.797093063, 24.557692308), (25.3828795, 25.143478746), (24.797093063, 26.557692308))
            Line((24.797093063, 26.557692308), (24.797093063, 24.557692308))
            Line((24.797093063, 24.557692308), (26.797093063, 24.557692308))
        make_face()
        with BuildLine():
            Line((35.027093063, 24.557692308), (37.027093063, 24.557692308))
            ThreePointArc((37.027093063, 24.557692308), (35.612879501, 25.143478745), (35.027093063, 26.557692308))
            Line((35.027093063, 26.557692308), (35.027093063, 24.557692308))
        make_face()
    extrude(amount=FILLET8_2_DEPTH)

    # Fillet8 3 outline → Fillet8 3 (cut)
    with SkipClean():  # the faces are left unmerged after this step: merging them gives an invalid solid
        with BuildSketch(Plane.YZ.offset(FILLET8_START_2)):
            with BuildLine():
                Line((-1, -24.557692308), (-1, -26.289743115))
                ThreePointArc((-1, -26.289743115), (-0.732047858, -25.289738007), (1.0217e-05, -24.557686409))
                Line((1.0217e-05, -24.557686409), (-1, -24.557692308))
            make_face()
            with BuildLine():
                Line((9, -24.557692308), (7.999989783, -24.557686409))
                ThreePointArc((7.999989783, -24.557686409), (8.732047858, -25.289738007), (9, -26.289743115))
                Line((9, -26.289743115), (9, -24.557692308))
            make_face()
        extrude(amount=FILLET8_3_DEPTH, mode=Mode.SUBTRACT)


solid = part.part
